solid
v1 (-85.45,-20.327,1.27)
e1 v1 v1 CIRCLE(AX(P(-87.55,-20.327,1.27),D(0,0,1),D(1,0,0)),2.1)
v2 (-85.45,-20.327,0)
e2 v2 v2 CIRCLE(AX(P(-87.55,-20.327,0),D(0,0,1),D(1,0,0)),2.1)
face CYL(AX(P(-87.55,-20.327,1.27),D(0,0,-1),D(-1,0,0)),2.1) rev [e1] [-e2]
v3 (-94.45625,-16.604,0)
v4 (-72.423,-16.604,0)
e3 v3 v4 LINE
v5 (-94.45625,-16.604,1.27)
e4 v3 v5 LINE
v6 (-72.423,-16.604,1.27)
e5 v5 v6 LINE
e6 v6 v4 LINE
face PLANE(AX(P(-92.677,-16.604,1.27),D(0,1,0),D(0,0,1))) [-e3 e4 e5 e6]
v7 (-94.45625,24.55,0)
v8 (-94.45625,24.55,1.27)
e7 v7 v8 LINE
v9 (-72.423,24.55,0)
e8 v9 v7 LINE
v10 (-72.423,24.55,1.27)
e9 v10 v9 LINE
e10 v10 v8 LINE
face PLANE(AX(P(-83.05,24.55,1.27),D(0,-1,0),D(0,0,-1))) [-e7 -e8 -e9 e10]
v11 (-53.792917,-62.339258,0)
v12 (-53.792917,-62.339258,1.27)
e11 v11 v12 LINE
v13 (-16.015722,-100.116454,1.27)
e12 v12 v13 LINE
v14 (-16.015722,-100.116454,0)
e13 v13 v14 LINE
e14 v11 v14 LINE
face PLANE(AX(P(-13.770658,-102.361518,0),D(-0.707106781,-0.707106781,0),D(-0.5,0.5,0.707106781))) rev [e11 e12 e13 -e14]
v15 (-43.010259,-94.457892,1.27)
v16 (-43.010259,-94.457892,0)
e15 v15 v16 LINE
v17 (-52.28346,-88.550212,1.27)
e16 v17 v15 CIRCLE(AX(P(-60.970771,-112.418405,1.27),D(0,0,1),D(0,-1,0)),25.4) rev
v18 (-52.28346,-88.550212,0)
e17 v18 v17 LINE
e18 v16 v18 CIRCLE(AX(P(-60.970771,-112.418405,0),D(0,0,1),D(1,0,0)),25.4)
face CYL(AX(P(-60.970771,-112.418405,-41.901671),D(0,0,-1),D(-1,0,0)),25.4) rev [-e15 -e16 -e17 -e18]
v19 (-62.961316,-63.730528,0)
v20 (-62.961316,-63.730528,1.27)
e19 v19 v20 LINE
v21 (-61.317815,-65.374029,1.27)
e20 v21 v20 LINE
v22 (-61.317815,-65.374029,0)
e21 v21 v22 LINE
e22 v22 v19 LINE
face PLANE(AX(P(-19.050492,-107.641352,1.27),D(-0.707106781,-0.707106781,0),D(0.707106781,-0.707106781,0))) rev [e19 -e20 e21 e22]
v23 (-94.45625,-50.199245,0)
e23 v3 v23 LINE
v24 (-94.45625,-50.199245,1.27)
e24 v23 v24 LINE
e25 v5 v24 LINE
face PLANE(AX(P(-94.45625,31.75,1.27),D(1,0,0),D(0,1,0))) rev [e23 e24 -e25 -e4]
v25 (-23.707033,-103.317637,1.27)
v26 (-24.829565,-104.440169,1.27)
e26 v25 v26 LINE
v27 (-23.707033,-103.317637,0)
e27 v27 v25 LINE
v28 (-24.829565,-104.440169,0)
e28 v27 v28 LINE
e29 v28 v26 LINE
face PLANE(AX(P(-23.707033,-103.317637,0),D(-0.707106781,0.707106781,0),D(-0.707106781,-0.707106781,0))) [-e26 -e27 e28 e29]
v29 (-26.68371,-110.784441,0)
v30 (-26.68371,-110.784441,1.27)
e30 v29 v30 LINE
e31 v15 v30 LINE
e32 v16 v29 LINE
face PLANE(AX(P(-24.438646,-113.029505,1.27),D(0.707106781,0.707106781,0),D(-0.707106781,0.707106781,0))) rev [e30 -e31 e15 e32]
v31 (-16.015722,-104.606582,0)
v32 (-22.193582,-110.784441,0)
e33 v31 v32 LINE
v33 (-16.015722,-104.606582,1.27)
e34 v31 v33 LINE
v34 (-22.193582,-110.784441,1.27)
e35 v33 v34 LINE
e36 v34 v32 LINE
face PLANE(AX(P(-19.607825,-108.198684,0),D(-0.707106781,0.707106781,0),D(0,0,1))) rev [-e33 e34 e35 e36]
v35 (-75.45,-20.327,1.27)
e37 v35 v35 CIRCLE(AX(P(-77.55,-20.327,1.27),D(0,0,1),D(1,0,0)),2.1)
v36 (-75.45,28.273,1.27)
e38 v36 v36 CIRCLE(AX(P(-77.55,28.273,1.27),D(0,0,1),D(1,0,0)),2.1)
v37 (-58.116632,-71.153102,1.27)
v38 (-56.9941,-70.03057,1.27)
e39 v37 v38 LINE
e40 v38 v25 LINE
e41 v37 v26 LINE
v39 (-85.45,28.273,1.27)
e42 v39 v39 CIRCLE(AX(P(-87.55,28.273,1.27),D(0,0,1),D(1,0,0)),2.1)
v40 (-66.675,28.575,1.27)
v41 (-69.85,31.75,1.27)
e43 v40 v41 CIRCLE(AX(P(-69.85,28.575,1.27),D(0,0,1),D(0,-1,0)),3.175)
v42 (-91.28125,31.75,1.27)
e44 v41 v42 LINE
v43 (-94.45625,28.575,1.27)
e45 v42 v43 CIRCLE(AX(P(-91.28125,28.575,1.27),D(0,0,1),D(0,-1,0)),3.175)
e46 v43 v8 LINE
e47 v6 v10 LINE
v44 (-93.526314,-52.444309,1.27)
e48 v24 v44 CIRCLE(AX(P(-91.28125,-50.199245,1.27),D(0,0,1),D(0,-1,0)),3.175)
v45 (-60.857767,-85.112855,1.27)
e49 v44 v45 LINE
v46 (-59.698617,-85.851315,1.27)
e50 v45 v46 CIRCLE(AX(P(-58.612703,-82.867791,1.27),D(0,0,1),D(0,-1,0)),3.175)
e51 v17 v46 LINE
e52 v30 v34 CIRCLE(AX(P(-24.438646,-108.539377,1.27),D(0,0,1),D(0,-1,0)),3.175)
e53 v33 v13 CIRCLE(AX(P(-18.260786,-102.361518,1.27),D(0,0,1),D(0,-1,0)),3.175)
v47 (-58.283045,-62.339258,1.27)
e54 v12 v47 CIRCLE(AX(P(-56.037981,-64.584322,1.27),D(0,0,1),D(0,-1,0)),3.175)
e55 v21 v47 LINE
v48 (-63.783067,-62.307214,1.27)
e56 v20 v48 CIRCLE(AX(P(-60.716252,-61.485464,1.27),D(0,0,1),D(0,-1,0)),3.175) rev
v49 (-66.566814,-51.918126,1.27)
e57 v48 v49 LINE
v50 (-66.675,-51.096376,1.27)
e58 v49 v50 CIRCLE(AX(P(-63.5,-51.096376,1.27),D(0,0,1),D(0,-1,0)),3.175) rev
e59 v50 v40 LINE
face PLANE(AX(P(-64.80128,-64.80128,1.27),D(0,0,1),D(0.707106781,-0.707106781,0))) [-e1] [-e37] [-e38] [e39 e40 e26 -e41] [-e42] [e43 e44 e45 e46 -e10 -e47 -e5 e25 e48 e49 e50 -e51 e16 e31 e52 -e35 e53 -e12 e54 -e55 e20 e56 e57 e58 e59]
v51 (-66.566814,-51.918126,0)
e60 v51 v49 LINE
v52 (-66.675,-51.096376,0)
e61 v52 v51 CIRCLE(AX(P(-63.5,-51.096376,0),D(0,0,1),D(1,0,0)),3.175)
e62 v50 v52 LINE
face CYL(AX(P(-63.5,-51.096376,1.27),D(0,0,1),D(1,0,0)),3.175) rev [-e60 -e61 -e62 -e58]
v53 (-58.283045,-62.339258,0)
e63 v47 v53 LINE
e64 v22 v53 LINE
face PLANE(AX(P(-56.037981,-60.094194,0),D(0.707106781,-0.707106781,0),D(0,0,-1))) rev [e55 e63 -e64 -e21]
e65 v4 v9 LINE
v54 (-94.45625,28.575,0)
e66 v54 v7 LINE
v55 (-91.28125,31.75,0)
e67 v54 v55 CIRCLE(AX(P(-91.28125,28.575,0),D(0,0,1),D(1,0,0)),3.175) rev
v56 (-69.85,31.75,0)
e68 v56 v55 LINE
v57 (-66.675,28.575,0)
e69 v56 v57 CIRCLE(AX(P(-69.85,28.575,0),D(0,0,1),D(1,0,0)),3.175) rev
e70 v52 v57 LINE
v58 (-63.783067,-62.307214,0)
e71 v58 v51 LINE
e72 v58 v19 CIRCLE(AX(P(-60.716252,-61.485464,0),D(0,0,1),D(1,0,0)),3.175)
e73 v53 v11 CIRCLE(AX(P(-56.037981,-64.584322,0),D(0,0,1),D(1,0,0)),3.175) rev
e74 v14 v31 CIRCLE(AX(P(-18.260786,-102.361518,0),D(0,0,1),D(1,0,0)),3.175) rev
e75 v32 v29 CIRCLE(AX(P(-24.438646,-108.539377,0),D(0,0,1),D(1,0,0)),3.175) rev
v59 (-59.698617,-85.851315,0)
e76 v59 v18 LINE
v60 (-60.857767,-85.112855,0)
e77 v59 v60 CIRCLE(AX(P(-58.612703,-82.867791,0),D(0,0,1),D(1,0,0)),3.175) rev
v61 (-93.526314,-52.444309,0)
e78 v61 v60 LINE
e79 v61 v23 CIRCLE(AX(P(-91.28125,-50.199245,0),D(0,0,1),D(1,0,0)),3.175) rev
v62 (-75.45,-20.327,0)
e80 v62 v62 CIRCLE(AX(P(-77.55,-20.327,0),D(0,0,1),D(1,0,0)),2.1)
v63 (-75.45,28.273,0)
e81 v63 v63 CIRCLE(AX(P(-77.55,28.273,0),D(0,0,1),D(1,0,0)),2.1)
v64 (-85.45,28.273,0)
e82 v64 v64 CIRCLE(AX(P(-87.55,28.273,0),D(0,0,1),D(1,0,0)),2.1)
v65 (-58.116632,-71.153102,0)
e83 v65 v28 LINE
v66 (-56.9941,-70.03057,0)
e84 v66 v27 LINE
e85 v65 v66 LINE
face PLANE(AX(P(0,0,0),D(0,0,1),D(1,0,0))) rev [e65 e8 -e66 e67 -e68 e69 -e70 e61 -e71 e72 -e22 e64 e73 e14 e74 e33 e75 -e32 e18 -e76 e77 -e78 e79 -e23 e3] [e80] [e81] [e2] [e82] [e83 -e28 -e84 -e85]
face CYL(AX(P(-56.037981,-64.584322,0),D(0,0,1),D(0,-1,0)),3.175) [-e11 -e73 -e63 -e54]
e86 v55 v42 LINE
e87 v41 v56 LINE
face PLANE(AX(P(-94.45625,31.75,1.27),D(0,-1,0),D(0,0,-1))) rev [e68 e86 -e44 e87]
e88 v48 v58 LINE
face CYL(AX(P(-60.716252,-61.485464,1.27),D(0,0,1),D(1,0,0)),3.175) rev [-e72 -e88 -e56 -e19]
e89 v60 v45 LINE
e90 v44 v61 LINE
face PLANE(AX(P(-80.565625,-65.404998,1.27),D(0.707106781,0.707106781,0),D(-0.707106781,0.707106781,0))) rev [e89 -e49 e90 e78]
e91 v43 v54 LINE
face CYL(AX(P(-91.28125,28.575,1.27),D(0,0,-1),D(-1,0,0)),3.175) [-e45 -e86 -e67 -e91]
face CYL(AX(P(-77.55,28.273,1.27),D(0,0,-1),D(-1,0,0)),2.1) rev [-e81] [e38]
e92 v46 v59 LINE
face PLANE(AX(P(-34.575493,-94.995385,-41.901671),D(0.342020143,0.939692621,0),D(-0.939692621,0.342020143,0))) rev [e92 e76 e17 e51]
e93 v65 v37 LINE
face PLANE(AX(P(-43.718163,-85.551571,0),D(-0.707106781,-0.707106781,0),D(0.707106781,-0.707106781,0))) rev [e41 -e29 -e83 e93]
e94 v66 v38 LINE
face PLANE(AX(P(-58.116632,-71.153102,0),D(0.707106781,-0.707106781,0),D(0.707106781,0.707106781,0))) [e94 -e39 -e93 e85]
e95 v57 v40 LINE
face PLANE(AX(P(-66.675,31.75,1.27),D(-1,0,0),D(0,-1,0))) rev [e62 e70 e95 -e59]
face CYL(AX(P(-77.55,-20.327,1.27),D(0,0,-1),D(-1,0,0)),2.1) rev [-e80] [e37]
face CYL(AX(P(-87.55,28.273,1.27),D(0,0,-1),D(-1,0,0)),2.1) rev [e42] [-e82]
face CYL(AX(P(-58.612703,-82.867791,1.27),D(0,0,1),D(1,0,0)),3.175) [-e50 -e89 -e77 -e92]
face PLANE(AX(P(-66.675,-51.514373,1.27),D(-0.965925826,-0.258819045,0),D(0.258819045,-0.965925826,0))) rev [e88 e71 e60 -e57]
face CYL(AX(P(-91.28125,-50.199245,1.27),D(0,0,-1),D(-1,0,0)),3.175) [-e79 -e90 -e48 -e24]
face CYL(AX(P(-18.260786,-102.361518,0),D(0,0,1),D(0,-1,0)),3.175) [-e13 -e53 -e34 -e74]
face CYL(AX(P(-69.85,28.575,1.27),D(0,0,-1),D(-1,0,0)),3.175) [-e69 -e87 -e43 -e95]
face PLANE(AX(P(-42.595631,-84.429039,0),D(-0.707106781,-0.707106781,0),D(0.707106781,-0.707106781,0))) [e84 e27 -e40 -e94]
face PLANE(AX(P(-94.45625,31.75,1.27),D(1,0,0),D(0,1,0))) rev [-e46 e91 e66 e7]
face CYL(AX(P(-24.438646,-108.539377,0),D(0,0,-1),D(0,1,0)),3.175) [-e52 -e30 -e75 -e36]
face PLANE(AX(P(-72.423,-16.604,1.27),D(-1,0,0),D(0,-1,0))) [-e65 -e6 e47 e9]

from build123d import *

# Parameters (mm, degrees)
SKETCH1_R                    = 2.099999991
BASE_FLANGE1_DEPTH           = 1.27
EDGE_FLANGE2_STRIP_W         = 6.5532
EDGE_FLANGE2_STRIP_H         = 1.27
EDGE_FLANGE2_STRIP_CUT_DEPTH = 59.775021713
EDGE_FLANGE2_DEPTH           = 59.775021713
SKETCH14_W                   = 1.779250061
SKETCH14_H                   = 41.153999988
CUT_EXTRUDE1_DEPTH           = 148.532360138
CUT_EXTRUDE_THIN2_START      = 2.868175785
CUT_EXTRUDE_THIN2_DEPTH      = 59.775021713
CUT_EXTRUDE_THIN2_START_2    = 9.218175785
CUT_EXTRUDE_THIN2_2_DEPTH    = 47.075021713
CUT_EXTRUDE_THIN2_3_DEPTH    = 59.775021713
CUT_EXTRUDE_THIN2_4_DEPTH    = 6.35
CUT_EXTRUDE_THIN2_START_3    = 56.293197498
CUT_EXTRUDE_THIN2_5_DEPTH    = 6.35
BOSS_EXTRUDE1_DEPTH          = 1.27
FILLET1_R                    = 25.4
FILLET2_R                    = 3.175


# Read off the part's stored shape, not the designer's step: Cut-Extrude-Thin2
# Sheet-metal steps are written as plain solids
with BuildPart() as part:
    # Sketch1 → Base-Flange1 (new body)
    with BuildSketch(Plane.XY):
        Polygon((-24.438645943, -113.029505435), (-19.05049227, -107.641351762), (-63.562879499, -63.128964533), (-66.675, -51.514372705), (-66.675, 31.75), (-94.45625, 31.75), (-94.45625, -51.514372705), (-80.565625, -65.404997705), (-68.951033172, -68.517118206), align=None)
        with Locations((-87.550000033, 28.272999969)):
            Circle(SKETCH1_R, mode=Mode.SUBTRACT)
        with Locations((-77.549999967, 28.272999969)):
            Circle(SKETCH1_R, mode=Mode.SUBTRACT)
        with Locations((-87.550000033, -20.327000113)):
            Circle(SKETCH1_R, mode=Mode.SUBTRACT)
        with Locations((-77.549999967, -20.327000113)):
            Circle(SKETCH1_R, mode=Mode.SUBTRACT)
        Polygon((-92.676999939, -16.604000066), (-83.05, -16.604000066), (-82.05, -16.604000066), (-72.423000061, -16.604000066), (-72.423000061, 24.549999922), (-82.05, 24.549999922), (-83.05, 24.549999922), (-92.676999939, 24.549999922), align=None, mode=Mode.SUBTRACT)
    extrude(amount=BASE_FLANGE1_DEPTH)

    # Edge-Flange2 strip (across the edge) → Edge-Flange2 strip cut (cut)
    with BuildSketch(Plane(origin=(-19.05049227, -107.641351762, 1.27), x_dir=(-0.707106781186551, -0.707106781186544, 3.4914813388431334e-15), z_dir=(-0.707106781186544, 0.707106781186551, 0))):
        with Locations((-1.27, -0.635)):
            Rectangle(EDGE_FLANGE2_STRIP_W, EDGE_FLANGE2_STRIP_H)
    extrude(amount=EDGE_FLANGE2_STRIP_CUT_DEPTH, mode=Mode.SUBTRACT)

    # Edge-Flange2 section (across the edge) → Edge-Flange2 (add)
    with BuildSketch(Plane(origin=(-19.05049227, -107.641351762, 1.27), x_dir=(-0.707106781186551, -0.707106781186544, 3.4914813388431334e-15), z_dir=(-0.707106781186544, 0.707106781186551, 0))):
        with BuildLine():
            Line((0, 0.7366), (0, 8.255))
            Line((0, 8.255), (1.27, 8.255))
            Line((1.27, 8.255), (1.27, 0.7366))
            ThreePointArc((1.27, 0.7366), (1.485745145, 0.215745145), (2.0066, 0))
            Line((2.0066, 0), (2.0066, -1.27))
            ThreePointArc((2.0066, -1.27), (0.587719533, -0.682280467), (0, 0.7366))
        make_face()
    extrude(amount=EDGE_FLANGE2_DEPTH)

    # Sketch14 → Cut-Extrude1 (cut, through all)
    with BuildSketch(Plane.XY.offset(1.27)):
        with Locations((-93.56662497, 3.972999928)):
            Rectangle(SKETCH14_W, SKETCH14_H)
    extrude(amount=-CUT_EXTRUDE1_DEPTH, mode=Mode.SUBTRACT)

    # Cut-Extrude-Thin2 outline → Cut-Extrude-Thin2 (cut)
    with BuildSketch(Plane(origin=(0, 0, 0), x_dir=(0.7071067811865438, 0.7071067811865512, 0), z_dir=(0.7071067811865511, -0.7071067811865441, 0)).offset(CUT_EXTRUDE_THIN2_START)):
        with BuildLine():
            Line((-91.591262036, 1.27), (-89.724750852, 1.27))
            ThreePointArc((-89.724750852, 1.27), (-89.619995324, 1.631698534), (-89.584662036, 2.0066))
            Line((-89.584662036, 2.0066), (-89.584662036, 9.525))
            Line((-89.584662036, 9.525), (-90.854662036, 9.525))
            Line((-90.854662036, 9.525), (-90.854662036, 2.0066))
            ThreePointArc((-90.854662036, 2.0066), (-91.070407181, 1.485745145), (-91.591262036, 1.27))
        make_face()
    extrude(amount=CUT_EXTRUDE_THIN2_DEPTH, mode=Mode.SUBTRACT)

    # Cut-Extrude-Thin2 2 outline → Cut-Extrude-Thin2 2 (cut)
    with BuildSketch(Plane(origin=(0, 0, 0), x_dir=(0.7071067811865438, 0.7071067811865512, 0), z_dir=(0.7071067811865511, -0.7071067811865441, 0)).offset(CUT_EXTRUDE_THIN2_START_2)):
        with BuildLine():
            ThreePointArc((-91.407505482, 0.008431566), (-90.480448103, 0.335511742), (-89.820005482, 1.063682305))
            Line((-89.820005482, 1.063682305), (-89.820005482, 1.27))
            Line((-89.820005482, 1.27), (-91.407505482, 1.27))
            Line((-91.407505482, 1.27), (-91.407505482, 0.008431566))
        make_face()
    extrude(amount=CUT_EXTRUDE_THIN2_2_DEPTH, mode=Mode.SUBTRACT)

    # Cut-Extrude-Thin2 3 outline → Cut-Extrude-Thin2 3 (add)
    with BuildSketch(Plane(origin=(0, 0, 0), x_dir=(0.7071067811865438, 0.7071067811865512, 0), z_dir=(0.7071067811865511, -0.7071067811865441, 0)).offset(CUT_EXTRUDE_THIN2_START)):
        with BuildLine():
            Line((-89.820005482, 0), (-82.117848928, 0))
            Line((-82.117848928, 0), (-82.117848928, 1.27))
            Line((-82.117848928, 1.27), (-89.724750852, 1.27))
            ThreePointArc((-89.724750852, 1.27), (-89.769455165, 1.165491634), (-89.820005482, 1.063682305))
            Line((-89.820005482, 1.063682305), (-89.820005482, 0))
        make_face()
        with BuildLine():
            Line((-91.591262036, 0), (-91.407505482, 0))
            Line((-91.407505482, 0), (-91.407505482, 0.008431566))
            ThreePointArc((-91.407505482, 0.008431566), (-91.49928709, 0.002109), (-91.591262036, 0))
        make_face()
    extrude(amount=CUT_EXTRUDE_THIN2_3_DEPTH)

    # Cut-Extrude-Thin2 4 outline → Cut-Extrude-Thin2 4 (add)
    with BuildSketch(Plane(origin=(0, 0, 0), x_dir=(0.7071067811865438, 0.7071067811865512, 0), z_dir=(0.7071067811865511, -0.7071067811865441, 0)).offset(CUT_EXTRUDE_THIN2_START)):
        with BuildLine():
            Line((-91.407505482, 0), (-89.820005482, 0))
            Line((-89.820005482, 0), (-89.820005482, 1.063682305))
            ThreePointArc((-89.820005482, 1.063682305), (-90.480448103, 0.335511742), (-91.407505482, 0.008431566))
            Line((-91.407505482, 0.008431566), (-91.407505482, 0))
        make_face()
    extrude(amount=CUT_EXTRUDE_THIN2_4_DEPTH)

    # Cut-Extrude-Thin2 5 outline → Cut-Extrude-Thin2 5 (add)
    with BuildSketch(Plane(origin=(0, 0, 0), x_dir=(0.7071067811865438, 0.7071067811865512, 0), z_dir=(0.7071067811865511, -0.7071067811865441, 0)).offset(CUT_EXTRUDE_THIN2_START_3)):
        with BuildLine():
            Line((-91.407505482, 0), (-89.820005482, 0))
            Line((-89.820005482, 0), (-89.820005482, 1.063682305))
            ThreePointArc((-89.820005482, 1.063682305), (-90.480448103, 0.335511742), (-91.407505482, 0.008431566))
            Line((-91.407505482, 0.008431566), (-91.407505482, 0))
        make_face()
    extrude(amount=CUT_EXTRUDE_THIN2_5_DEPTH)

    # Sketch17 → Boss-Extrude1 (add)
    with BuildSketch(Plane.XY.offset(1.27)):
        Polygon((-68.951033172, -68.517118206), (-80.565625, -65.404997705), (-60.360048728, -85.610573978), (-46.992008762, -90.476142615), align=None)
    extrude(amount=-BOSS_EXTRUDE1_DEPTH)

    # Fillet1
    fillet1_edges = [part.edges().sort_by_distance(p)[0] for p in [
        (-46.992008762, -90.476142615, 0.635),
    ]]
    fillet(fillet1_edges, radius=FILLET1_R)

    # Fillet2
    fillet2_edges = [part.edges().sort_by_distance(p)[0] for p in [
        (-94.45625, 31.75, 0.635),
        (-66.675, 31.75, 0.635),
        (-66.675, -51.514372705, 0.635),
        (-63.562879499, -63.128964533, 0.635),
        (-94.45625, -51.514372705, 0.635),
        (-24.438645943, -113.029505435, 0.635),
        (-60.360048728, -85.610573978, 0.635),
        (-13.770658087, -102.361517579, 0.635),
        (-56.037981286, -60.094194381, 0.635),
    ]]
    fillet(fillet2_edges, radius=FILLET2_R)


solid = part.part
